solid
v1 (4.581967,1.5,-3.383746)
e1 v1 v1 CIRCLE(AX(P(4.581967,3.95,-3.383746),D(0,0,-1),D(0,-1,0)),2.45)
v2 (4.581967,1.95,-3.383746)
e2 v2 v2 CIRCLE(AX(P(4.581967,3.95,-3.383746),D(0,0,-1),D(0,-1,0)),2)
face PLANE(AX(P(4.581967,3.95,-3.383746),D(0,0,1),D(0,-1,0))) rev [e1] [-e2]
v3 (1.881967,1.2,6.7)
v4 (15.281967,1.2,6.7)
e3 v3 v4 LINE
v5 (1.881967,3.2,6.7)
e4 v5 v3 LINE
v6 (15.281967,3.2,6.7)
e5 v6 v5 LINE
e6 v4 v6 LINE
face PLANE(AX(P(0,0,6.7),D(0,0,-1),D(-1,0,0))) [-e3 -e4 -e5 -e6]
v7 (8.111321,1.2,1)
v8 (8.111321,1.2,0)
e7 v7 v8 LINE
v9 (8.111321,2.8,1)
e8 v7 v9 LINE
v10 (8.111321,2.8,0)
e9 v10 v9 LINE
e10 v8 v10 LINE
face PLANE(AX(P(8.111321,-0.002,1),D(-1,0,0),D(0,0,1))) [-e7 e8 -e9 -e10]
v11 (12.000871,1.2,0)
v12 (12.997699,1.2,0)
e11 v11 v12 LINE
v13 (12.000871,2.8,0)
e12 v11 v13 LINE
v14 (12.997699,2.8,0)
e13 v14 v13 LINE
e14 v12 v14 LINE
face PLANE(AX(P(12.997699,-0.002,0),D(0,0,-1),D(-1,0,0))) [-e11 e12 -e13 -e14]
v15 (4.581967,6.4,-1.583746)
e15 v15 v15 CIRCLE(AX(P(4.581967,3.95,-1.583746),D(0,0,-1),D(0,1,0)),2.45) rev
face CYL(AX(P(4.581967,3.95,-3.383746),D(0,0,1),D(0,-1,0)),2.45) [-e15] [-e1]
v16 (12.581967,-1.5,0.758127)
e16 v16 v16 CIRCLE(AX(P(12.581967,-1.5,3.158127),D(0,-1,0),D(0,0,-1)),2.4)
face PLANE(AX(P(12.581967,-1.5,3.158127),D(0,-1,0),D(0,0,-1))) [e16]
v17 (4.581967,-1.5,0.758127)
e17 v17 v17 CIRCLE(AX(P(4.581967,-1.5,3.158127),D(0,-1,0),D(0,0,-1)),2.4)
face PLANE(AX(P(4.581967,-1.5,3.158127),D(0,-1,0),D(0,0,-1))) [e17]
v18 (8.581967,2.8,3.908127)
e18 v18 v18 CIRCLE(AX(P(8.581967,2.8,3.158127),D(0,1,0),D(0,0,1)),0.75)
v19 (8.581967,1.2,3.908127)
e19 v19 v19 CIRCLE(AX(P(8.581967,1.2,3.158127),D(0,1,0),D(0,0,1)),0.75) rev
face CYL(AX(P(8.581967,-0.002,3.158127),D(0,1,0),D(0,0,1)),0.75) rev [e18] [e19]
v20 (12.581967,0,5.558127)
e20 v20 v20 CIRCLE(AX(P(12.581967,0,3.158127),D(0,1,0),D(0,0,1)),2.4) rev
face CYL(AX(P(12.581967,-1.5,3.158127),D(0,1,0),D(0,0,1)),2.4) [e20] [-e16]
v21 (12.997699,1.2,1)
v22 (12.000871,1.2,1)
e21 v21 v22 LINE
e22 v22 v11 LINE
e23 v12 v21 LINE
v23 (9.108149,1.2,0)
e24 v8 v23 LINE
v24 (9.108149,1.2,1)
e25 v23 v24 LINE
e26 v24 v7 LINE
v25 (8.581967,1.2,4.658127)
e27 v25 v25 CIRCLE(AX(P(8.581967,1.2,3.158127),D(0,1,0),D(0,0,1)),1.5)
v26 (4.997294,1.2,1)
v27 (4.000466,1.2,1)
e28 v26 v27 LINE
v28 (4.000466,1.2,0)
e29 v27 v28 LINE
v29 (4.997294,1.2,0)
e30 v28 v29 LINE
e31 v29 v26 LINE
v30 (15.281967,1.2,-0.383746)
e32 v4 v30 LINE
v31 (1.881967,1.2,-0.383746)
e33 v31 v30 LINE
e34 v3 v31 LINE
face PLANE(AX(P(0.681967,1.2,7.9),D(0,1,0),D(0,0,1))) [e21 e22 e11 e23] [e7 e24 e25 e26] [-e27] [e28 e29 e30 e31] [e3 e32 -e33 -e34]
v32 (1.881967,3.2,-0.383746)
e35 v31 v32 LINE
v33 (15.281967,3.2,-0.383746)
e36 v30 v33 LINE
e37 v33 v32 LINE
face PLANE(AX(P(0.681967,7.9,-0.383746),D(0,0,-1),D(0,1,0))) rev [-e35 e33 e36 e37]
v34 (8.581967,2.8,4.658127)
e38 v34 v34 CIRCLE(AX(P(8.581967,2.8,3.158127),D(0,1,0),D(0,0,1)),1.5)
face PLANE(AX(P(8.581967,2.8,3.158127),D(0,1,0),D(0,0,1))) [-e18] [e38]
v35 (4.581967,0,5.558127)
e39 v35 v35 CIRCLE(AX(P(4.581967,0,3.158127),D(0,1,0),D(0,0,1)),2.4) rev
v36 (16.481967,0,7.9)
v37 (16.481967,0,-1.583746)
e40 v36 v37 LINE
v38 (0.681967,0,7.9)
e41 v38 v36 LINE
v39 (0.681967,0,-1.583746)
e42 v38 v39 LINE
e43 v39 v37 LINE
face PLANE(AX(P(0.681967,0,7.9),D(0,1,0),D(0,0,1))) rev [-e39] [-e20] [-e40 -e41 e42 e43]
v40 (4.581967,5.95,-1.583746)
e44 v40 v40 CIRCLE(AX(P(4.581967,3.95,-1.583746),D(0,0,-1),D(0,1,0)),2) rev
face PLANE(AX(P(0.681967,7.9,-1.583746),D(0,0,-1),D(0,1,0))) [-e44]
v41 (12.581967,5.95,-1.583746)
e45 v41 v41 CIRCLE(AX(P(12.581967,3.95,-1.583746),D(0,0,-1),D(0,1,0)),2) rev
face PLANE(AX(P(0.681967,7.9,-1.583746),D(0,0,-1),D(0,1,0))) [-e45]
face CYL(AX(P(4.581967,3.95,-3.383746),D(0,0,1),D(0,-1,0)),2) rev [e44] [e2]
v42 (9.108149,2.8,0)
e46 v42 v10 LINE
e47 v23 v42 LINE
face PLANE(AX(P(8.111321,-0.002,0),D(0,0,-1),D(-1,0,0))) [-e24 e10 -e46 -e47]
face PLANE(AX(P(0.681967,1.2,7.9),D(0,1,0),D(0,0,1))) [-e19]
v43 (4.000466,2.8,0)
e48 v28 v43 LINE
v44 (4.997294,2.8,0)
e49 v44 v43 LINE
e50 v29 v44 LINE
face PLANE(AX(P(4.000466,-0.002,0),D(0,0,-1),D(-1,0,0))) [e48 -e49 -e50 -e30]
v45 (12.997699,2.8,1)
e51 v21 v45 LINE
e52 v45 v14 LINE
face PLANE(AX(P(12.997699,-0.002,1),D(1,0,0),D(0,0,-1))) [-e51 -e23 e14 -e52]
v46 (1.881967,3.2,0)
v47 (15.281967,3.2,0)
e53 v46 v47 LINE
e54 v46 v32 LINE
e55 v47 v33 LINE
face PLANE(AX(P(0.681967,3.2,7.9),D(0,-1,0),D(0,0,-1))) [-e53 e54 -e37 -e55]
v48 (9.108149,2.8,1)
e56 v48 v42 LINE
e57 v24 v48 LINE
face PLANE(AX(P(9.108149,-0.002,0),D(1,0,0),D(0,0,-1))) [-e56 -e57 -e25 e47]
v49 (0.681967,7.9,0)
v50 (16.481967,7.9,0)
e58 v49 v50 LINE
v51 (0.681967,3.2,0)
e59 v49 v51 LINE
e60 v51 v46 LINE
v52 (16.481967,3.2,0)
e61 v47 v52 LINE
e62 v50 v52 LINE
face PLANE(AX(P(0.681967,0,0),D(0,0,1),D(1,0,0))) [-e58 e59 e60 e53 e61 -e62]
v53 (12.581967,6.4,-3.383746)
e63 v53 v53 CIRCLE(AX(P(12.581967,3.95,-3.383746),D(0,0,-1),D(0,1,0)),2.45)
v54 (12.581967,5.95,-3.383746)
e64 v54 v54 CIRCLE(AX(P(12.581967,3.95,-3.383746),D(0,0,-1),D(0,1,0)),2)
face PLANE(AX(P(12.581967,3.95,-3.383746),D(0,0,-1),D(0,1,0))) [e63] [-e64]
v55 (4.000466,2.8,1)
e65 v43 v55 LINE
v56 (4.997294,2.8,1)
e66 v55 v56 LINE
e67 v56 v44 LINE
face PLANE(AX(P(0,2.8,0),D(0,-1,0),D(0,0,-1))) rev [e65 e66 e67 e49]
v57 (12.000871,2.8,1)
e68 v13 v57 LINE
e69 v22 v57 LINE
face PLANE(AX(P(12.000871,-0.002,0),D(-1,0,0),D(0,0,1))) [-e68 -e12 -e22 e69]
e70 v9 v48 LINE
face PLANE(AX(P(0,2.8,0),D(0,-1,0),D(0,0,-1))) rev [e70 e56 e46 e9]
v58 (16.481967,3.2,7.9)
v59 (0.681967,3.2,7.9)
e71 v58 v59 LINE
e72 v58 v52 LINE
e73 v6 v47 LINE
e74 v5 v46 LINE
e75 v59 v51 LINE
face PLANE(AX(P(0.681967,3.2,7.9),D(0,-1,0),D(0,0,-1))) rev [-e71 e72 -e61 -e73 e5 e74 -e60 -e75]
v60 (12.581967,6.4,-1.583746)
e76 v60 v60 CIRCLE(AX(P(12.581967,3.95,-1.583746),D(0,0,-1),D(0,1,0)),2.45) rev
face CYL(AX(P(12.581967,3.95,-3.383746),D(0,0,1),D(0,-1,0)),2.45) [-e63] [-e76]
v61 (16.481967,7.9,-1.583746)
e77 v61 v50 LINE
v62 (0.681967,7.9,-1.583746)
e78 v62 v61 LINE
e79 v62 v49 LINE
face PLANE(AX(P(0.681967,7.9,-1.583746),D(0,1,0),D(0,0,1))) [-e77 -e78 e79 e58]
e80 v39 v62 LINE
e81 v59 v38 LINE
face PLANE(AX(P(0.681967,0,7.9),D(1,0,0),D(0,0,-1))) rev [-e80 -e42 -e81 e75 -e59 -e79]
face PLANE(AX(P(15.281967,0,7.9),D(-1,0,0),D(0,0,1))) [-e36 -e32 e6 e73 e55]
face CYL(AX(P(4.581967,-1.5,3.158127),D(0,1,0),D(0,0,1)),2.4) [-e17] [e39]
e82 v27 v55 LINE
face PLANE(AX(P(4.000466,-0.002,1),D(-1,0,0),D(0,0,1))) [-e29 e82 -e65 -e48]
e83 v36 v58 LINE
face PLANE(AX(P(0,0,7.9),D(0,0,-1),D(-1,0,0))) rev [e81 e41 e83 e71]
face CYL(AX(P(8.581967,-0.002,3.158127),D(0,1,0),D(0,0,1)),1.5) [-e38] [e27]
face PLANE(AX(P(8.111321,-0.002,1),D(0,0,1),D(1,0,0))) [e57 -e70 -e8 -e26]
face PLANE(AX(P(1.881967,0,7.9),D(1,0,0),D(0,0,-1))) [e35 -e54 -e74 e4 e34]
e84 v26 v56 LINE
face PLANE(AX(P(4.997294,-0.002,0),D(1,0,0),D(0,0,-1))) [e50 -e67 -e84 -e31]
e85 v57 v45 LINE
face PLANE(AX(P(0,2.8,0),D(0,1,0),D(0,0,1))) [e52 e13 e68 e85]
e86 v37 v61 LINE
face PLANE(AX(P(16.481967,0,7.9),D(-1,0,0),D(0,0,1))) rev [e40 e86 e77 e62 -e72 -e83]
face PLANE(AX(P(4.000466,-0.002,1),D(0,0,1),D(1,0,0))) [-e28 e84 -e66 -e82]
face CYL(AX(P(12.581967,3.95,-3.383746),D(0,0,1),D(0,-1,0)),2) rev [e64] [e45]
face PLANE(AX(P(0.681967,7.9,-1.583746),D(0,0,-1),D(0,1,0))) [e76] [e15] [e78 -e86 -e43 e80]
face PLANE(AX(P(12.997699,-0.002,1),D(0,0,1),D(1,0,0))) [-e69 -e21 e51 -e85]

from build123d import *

# Parameters (mm, degrees)
MAINBASESKETCH_W             = 15.8
MAINBASESKETCH_H             = 3.2
MAINBASEEXTRUDE_DEPTH        = 7.9
LCUTBLUE_DEPTH               = 19.555463972
LCUTBLUE_DEPTH_BACK          = 19.555463972
MADESLIMCUTSKETCH_W          = 7.9
MADESLIMCUTSKETCH_H          = 7.9
MADESLIMCUT_DEPTH            = 19.555463972
SHORTLEXTENSIONSKETCH_W      = 1.583745828
SHORTLEXTENSIONSKETCH_H      = 7.9
SHORTLUPPERCIRCLES_START     = -0.2
SHORTLUPPERCIRCLESSKETCH_R   = 2.45
SHORTLUPPERCIRCLESSKETCH_R_2 = 2
SHORTLUPPERCIRCLES_DEPTH     = 2
SHELL1_START                 = 1.2
SHELL1_OUTLINE_W             = 13.4
SHELL1_OUTLINE_H             = 7.083745828
SHELL1_DEPTH                 = 2
BOSS_EXTRUDE4_REACH          = 21.272
BOSS_EXTRUDE4_START          = -0.4
SKETCH89_R                   = 1.5
SKETCH89_R_2                 = 0.75
SKETCH89_W                   = 0.996828099
SKETCH89_H                   = 1
SKETCH89_W_2                 = 0.996828098
SKETCH90_R                   = 2.4
BOSS_EXTRUDE5_DEPTH          = 1.5


# Read off the part's stored shape, not the designer's step: Shell1
with BuildPart() as part:
    # MainBaseSketch → MainBaseExtrude (new, symmetric)
    with BuildSketch(Plane.XY):
        with Locations((8.581967213, 1.6)):
            Rectangle(MAINBASESKETCH_W, MAINBASESKETCH_H)
    extrude(amount=MAINBASEEXTRUDE_DEPTH, both=True)

    # LCUTBlueSketch → LCutBlue (cut, two sides: drawn at the far end of the back side and taken through both)
    with BuildSketch(Plane(origin=(0, 3.2, 0), x_dir=(1, 0, 0), z_dir=(0, 1, 0)).offset(-LCUTBLUE_DEPTH_BACK)):
        Polygon((8.581967213, 53.229874044), (8.581967213, 7.9), (8.581967213, 0), (16.481967213, 0), (61.811841258, 0), (125.917963912, 64.106122654), (72.688089868, 117.335996699), align=None)
    extrude(amount=LCUTBLUE_DEPTH + LCUTBLUE_DEPTH_BACK, mode=Mode.SUBTRACT)

    # MadeSlimCutSketch → MadeSlimCut (cut, through all)
    with BuildSketch(Plane.XZ):
        with Locations((4.631967213, -3.95)):
            Rectangle(MADESLIMCUTSKETCH_W, MADESLIMCUTSKETCH_H)
    extrude(amount=-MADESLIMCUT_DEPTH, mode=Mode.SUBTRACT)

    # ShortLExtension: sweep along a curve in space
    with BuildLine() as shortlextension_path:
        Line((0.681967213, 3.2, 0), (16.481967213, 3.2, 0))
    # ShortLExtensionSketch → ShortLExtension (sweep)
    with BuildSketch(Plane(origin=(16.481967213, 0, 0), x_dir=(0, 0, -1), z_dir=(1, 0, 0))):
        with Locations((0.791872914, 3.95)):
            Rectangle(SHORTLEXTENSIONSKETCH_W, SHORTLEXTENSIONSKETCH_H)
    sweep(path=shortlextension_path.line)

    # ShortLUpperCirclesSketch → ShortLUpperCircles (add)
    # profile 1 of 2: a face of its own
    with BuildSketch(Plane(origin=(0, 0, -1.583745828), x_dir=(-1, 0, 0), z_dir=(0, 0, -1)).offset(SHORTLUPPERCIRCLES_START)):
        with Locations(Location((-12.581967213, 3.95, 0), (0, 0, 90))):
            Circle(SHORTLUPPERCIRCLESSKETCH_R)
        with Locations(Location((-12.581967213, 3.95, 0), (0, 0, 90))):
            Circle(SHORTLUPPERCIRCLESSKETCH_R_2, mode=Mode.SUBTRACT)
    # profile 2 of 2: a face of its own
    with BuildSketch(Plane(origin=(0, 0, -1.583745828), x_dir=(-1, 0, 0), z_dir=(0, 0, -1)).offset(SHORTLUPPERCIRCLES_START)):
        with Locations(Location((-4.581967213, 3.95, 0), (0, 0, 270))):
            Circle(SHORTLUPPERCIRCLESSKETCH_R)
        with Locations(Location((-4.581967213, 3.95, 0), (0, 0, 270))):
            Circle(SHORTLUPPERCIRCLESSKETCH_R_2, mode=Mode.SUBTRACT)
    extrude(amount=SHORTLUPPERCIRCLES_DEPTH)

    # Shell1 outline → Shell1 (cut)
    with BuildSketch(Plane(origin=(0, 0, 0), x_dir=(1, 0, 0), z_dir=(0, 1, 0)).offset(SHELL1_START)):
        with Locations((8.581967213, -3.158127086)):
            Rectangle(SHELL1_OUTLINE_W, SHELL1_OUTLINE_H)
    extrude(amount=SHELL1_DEPTH, mode=Mode.SUBTRACT)

    # Sketch89 → Boss-Extrude4 (add, up to next)
    with BuildSketch(Plane(origin=(0, 3.2, 0), x_dir=(1, 0, 0), z_dir=(0, 1, 0)).offset(BOSS_EXTRUDE4_START), mode=Mode.PRIVATE) as boss_extrude4_sk1:
        with Locations(Location((8.581967213, -3.158127086, 0), (0, 0, 270))):
            Circle(SKETCH89_R)
        with Locations(Location((8.581967213, -3.158127086, 0), (0, 0, 270))):
            Circle(SKETCH89_R_2, mode=Mode.SUBTRACT)
    boss_extrude4_tool1 = extrude(boss_extrude4_sk1.sketch, amount=-BOSS_EXTRUDE4_REACH, mode=Mode.PRIVATE) - part.part
    # Sketch89 → Boss-Extrude4 (add, up to next)
    with BuildSketch(Plane(origin=(0, 3.2, 0), x_dir=(1, 0, 0), z_dir=(0, 1, 0)).offset(BOSS_EXTRUDE4_START), mode=Mode.PRIVATE) as boss_extrude4_sk2:
        with Locations((4.498879862, -0.5)):
            Rectangle(SKETCH89_W, SKETCH89_H)
    boss_extrude4_tool2 = extrude(boss_extrude4_sk2.sketch, amount=-BOSS_EXTRUDE4_REACH, mode=Mode.PRIVATE) - part.part
    # Sketch89 → Boss-Extrude4 (add, up to next)
    with BuildSketch(Plane(origin=(0, 3.2, 0), x_dir=(1, 0, 0), z_dir=(0, 1, 0)).offset(BOSS_EXTRUDE4_START), mode=Mode.PRIVATE) as boss_extrude4_sk3:
        with Locations((8.609734638, -0.5)):
            Rectangle(SKETCH89_W_2, SKETCH89_H)
    boss_extrude4_tool3 = extrude(boss_extrude4_sk3.sketch, amount=-BOSS_EXTRUDE4_REACH, mode=Mode.PRIVATE) - part.part
    # Sketch89 → Boss-Extrude4 (add, up to next)
    with BuildSketch(Plane(origin=(0, 3.2, 0), x_dir=(1, 0, 0), z_dir=(0, 1, 0)).offset(BOSS_EXTRUDE4_START), mode=Mode.PRIVATE) as boss_extrude4_sk4:
        with Locations((12.499284685, -0.5)):
            Rectangle(SKETCH89_W_2, SKETCH89_H)
    boss_extrude4_tool4 = extrude(boss_extrude4_sk4.sketch, amount=-BOSS_EXTRUDE4_REACH, mode=Mode.PRIVATE) - part.part
    add(boss_extrude4_tool1.solids().sort_by_distance((8.581967, 2.8, 1.700553))[0])
    add(boss_extrude4_tool2.solids().sort_by_distance((4.49888, 2.8, 0.5))[0])
    add(boss_extrude4_tool3.solids().sort_by_distance((8.609735, 2.8, 0.5))[0])
    add(boss_extrude4_tool4.solids().sort_by_distance((12.499285, 2.8, 0.5))[0])

    # Sketch90 → Boss-Extrude5 (add)
    with BuildSketch(Plane(origin=(0, 0, 0), x_dir=(-1, 0, 0), z_dir=(0, -1, 0))):
        with Locations(Location((-12.581967213, -3.158127086, 0), (0, 0, 270))):
            Circle(SKETCH90_R)
        with Locations(Location((-4.581967213, -3.158127086, 0), (0, 0, 270))):
            Circle(SKETCH90_R)
    extrude(amount=BOSS_EXTRUDE5_DEPTH)


solid = part.part
